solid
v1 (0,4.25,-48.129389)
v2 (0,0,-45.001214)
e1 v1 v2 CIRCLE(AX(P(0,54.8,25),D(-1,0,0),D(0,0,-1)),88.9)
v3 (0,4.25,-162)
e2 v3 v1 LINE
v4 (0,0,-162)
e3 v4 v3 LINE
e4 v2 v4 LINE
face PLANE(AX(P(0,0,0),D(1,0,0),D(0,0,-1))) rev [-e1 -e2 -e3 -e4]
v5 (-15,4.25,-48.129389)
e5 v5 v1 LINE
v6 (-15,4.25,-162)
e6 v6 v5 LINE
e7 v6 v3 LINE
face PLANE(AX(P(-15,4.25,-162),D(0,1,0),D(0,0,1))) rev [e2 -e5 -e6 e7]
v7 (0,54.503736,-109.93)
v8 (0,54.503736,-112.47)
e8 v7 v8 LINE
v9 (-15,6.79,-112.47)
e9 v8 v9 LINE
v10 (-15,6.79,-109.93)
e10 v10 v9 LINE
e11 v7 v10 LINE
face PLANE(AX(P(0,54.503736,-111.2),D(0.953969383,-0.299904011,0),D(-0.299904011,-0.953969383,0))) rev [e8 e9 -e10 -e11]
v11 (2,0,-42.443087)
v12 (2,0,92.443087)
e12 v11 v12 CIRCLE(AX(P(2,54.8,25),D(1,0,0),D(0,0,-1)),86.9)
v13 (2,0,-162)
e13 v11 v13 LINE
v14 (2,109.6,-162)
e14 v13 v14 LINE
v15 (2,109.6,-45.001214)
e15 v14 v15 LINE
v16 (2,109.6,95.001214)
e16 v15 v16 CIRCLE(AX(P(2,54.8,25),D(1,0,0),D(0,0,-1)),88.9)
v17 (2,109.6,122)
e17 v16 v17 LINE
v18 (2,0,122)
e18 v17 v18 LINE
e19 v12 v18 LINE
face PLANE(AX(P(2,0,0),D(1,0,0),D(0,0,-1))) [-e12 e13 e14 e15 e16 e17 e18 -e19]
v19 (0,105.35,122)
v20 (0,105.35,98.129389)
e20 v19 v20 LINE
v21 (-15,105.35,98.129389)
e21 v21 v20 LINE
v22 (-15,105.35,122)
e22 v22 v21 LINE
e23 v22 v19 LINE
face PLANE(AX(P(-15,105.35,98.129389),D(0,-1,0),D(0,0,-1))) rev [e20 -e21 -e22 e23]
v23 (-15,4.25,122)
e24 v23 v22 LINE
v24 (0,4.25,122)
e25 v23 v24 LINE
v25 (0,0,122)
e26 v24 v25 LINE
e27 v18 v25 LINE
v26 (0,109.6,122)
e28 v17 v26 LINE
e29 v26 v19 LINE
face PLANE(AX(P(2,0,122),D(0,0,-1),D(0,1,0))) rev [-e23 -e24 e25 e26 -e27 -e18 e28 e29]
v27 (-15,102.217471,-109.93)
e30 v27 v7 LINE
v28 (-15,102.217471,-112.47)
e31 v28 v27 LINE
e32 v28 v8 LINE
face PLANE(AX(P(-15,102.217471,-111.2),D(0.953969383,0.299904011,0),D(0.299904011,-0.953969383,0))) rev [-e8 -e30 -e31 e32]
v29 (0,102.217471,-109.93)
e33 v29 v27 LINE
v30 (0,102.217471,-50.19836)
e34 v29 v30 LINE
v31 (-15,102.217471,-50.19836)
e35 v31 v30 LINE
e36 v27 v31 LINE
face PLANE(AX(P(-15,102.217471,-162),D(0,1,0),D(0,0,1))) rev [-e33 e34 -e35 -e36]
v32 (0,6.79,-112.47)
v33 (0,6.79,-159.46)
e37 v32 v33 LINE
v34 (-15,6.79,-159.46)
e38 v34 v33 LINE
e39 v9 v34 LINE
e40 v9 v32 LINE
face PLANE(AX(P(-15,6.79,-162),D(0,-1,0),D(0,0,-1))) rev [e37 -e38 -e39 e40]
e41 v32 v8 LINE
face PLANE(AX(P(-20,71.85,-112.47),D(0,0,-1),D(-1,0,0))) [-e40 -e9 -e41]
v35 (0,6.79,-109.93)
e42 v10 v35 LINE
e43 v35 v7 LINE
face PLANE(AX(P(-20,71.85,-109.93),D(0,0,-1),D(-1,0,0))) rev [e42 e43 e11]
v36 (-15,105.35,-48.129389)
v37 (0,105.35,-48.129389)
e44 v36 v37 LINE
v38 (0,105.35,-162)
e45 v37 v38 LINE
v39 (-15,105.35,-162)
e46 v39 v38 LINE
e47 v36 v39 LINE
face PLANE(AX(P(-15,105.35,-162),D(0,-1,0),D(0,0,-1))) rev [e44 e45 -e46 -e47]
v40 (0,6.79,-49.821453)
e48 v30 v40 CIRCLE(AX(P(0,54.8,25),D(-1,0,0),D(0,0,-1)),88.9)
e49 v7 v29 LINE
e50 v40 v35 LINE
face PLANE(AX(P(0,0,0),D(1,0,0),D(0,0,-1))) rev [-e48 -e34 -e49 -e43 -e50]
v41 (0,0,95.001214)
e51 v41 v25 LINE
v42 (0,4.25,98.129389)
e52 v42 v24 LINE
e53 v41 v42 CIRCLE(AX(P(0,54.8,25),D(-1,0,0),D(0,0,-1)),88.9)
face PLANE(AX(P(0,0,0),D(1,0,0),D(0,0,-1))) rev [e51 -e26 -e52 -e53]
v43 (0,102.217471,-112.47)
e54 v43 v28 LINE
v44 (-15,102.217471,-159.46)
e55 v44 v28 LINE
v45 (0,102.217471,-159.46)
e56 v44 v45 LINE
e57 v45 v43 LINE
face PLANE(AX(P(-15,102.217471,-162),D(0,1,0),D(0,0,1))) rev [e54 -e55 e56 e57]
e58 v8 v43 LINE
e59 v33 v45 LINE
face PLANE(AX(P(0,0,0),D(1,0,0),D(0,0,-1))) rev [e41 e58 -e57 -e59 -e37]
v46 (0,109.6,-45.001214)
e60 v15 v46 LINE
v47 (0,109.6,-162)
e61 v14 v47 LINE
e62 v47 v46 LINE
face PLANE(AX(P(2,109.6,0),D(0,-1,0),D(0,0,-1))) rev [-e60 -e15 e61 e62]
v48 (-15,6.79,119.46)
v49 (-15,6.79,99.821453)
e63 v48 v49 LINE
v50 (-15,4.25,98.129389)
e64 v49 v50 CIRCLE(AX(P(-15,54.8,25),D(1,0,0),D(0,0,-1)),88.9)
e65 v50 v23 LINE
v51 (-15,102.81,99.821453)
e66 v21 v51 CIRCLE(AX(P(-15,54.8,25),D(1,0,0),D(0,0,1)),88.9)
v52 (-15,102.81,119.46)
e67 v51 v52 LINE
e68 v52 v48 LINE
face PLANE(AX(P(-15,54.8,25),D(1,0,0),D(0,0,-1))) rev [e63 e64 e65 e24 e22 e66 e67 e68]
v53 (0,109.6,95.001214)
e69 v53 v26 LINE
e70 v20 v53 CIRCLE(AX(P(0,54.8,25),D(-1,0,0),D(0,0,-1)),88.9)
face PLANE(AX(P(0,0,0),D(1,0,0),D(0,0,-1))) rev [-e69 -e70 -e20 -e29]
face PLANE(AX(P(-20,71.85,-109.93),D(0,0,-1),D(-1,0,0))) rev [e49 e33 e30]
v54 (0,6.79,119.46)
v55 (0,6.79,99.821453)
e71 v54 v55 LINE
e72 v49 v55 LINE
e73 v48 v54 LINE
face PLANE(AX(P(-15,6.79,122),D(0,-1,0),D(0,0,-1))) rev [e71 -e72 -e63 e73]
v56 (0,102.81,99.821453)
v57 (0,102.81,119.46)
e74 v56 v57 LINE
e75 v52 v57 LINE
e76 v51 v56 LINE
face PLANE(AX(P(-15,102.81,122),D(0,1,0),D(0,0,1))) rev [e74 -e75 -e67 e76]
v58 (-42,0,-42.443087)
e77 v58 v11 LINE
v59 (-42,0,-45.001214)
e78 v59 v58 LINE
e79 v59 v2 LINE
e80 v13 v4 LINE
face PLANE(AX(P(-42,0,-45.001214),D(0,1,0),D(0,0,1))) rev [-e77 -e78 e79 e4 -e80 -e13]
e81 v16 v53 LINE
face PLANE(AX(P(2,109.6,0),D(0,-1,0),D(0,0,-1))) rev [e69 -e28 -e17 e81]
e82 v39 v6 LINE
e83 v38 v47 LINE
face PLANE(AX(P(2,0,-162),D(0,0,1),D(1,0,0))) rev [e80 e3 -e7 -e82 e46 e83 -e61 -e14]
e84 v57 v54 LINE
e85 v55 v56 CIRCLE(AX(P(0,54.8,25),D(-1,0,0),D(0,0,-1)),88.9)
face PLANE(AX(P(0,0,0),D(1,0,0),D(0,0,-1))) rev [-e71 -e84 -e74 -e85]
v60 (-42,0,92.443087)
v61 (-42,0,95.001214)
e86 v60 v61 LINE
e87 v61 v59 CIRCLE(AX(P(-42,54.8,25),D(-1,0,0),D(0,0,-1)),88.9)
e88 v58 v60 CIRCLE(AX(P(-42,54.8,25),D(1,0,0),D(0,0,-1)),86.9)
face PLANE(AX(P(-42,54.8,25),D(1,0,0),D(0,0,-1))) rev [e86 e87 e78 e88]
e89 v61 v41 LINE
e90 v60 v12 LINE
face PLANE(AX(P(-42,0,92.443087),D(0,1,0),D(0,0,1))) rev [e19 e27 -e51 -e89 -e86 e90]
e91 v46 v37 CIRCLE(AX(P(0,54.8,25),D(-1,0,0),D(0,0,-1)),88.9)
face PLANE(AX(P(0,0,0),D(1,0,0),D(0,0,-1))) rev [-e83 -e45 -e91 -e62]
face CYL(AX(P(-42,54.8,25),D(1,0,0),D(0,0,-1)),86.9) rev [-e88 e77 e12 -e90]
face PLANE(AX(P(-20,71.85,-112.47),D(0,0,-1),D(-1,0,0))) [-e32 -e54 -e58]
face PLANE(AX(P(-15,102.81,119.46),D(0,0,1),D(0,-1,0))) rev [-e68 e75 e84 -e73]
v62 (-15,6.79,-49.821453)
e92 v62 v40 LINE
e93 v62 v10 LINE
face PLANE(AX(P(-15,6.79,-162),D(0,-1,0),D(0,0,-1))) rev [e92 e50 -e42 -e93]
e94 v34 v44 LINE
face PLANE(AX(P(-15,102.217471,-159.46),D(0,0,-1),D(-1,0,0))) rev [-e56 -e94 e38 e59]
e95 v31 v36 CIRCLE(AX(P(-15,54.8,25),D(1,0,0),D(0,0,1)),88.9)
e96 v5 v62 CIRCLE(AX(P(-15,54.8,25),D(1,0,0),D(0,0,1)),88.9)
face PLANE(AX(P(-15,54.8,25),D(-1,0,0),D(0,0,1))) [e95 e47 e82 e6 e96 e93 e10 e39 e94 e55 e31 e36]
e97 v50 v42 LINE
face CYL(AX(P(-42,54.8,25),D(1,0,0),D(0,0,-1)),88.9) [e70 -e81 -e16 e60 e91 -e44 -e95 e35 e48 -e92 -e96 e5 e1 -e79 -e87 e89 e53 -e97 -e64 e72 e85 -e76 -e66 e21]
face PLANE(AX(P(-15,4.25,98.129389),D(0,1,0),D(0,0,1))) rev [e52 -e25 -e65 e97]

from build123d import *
from build123d.topology import SkipClean

# Parameters (mm, degrees)
BOSS_EXTRUDE1_DEPTH = 42.000000074
BOSS_EXTRUDE2_START = -2.000000064
BOSS_EXTRUDE2_DEPTH = 2.000000064
BOSS_EXTRUDE3_DEPTH = 15
BOSS_EXTRUDE4_DEPTH = 15
BOSS_EXTRUDE5_DEPTH = 15
BOSS_EXTRUDE6_DEPTH = 15
RIB1_START          = -1.27
RIB1_DEPTH          = 2.54
RIB2_START          = -1.27
RIB2_DEPTH          = 2.54
SKETCH9_W           = 2.54
SKETCH9_H           = 95.427471492
BOSS_EXTRUDE7_DEPTH = 15
SKETCH10_W          = 2.54
SKETCH10_H          = 96.020000118
BOSS_EXTRUDE8_DEPTH = 15


# Read off the part's stored shape, not the designer's step: Rib1, Rib2
with BuildPart() as part:
    # Sketch1 → Boss-Extrude1 (new body)
    with BuildSketch(Plane.ZY):
        with BuildLine():
            Line((-45.001214275, 0), (-42.443087035, 0))
            ThreePointArc((-42.443087035, 0), (25, 141.699999936), (92.443087035, 0))
            Line((92.443087035, 0), (95.001214275, 0))
            ThreePointArc((95.001214275, 0), (25, 143.7), (-45.001214275, 0))
        make_face()
    extrude(amount=BOSS_EXTRUDE1_DEPTH)

    # Sketch2 → Boss-Extrude2 (add)
    with SkipClean():  # the faces are left unmerged after this step: merging them gives an invalid solid
        with BuildSketch(Plane.ZY.offset(BOSS_EXTRUDE2_START)):
            with BuildLine():
                Line((-160, 0), (-45.001214275, 0))
                ThreePointArc((-45.001214275, 0), (-63.9, 54.8), (-45.001214275, 109.6))
                Line((-45.001214275, 109.6), (-160, 109.6))
                Line((-160, 109.6), (-162.000000064, 109.6))
                Line((-162.000000064, 109.6), (-162.000000064, 0))
                Line((-162.000000064, 0), (-160, 0))
            make_face()
            with BuildLine():
                ThreePointArc((-45.001214275, 0), (25, 143.7), (95.001214275, 0))
                Line((95.001214275, 0), (92.443087035, 0))
                ThreePointArc((92.443087035, 0), (25, 141.699999936), (-42.443087035, 0))
                Line((-42.443087035, 0), (-45.001214275, 0))
            make_face()
            with BuildLine():
                ThreePointArc((95.001214275, 109.6), (113.9, 54.8), (95.001214275, 0))
                Line((95.001214275, 0), (120, 0))
                Line((120, 0), (122.000000064, 0))
                Line((122.000000064, 0), (122.000000064, 109.6))
                Line((122.000000064, 109.6), (120, 109.6))
                Line((120, 109.6), (95.001214275, 109.6))
            make_face()
        extrude(amount=BOSS_EXTRUDE2_DEPTH)

    # Sketch3 → Boss-Extrude3 (add)
    with SkipClean():  # the faces are left unmerged after this step: merging them gives an invalid solid
        with BuildSketch(Plane.ZY):
            with BuildLine():
                Line((98.129388676, 4.249999882), (122.000000064, 4.249999882))
                Line((122.000000064, 4.249999882), (122.000000064, 6.789999882))
                Line((122.000000064, 6.789999882), (99.821453399, 6.789999882))
                ThreePointArc((99.821453399, 6.789999882), (98.986321828, 5.512738133), (98.129388676, 4.249999882))
            make_face()
        extrude(amount=BOSS_EXTRUDE3_DEPTH)

    # Sketch4 → Boss-Extrude4 (add)
    with SkipClean():  # the faces are left unmerged after this step: merging them gives an invalid solid
        with BuildSketch(Plane.ZY):
            with BuildLine():
                Line((98.129388757, 105.35), (122.000000064, 105.35))
                Line((122.000000064, 105.35), (122.000000064, 102.81))
                Line((122.000000064, 102.81), (99.821453474, 102.81))
                ThreePointArc((99.821453474, 102.81), (98.986321906, 104.087261749), (98.129388757, 105.35))
            make_face()
        extrude(amount=BOSS_EXTRUDE4_DEPTH)

    # Sketch5 → Boss-Extrude5 (add)
    with SkipClean():  # the faces are left unmerged after this step: merging them gives an invalid solid
        with BuildSketch(Plane.ZY):
            with BuildLine():
                Line((-162.000000064, 4.25), (-48.129388757, 4.25))
                ThreePointArc((-48.129388757, 4.25), (-48.986321906, 5.512738251), (-49.821453474, 6.79))
                Line((-49.821453474, 6.79), (-162.000000064, 6.79))
                Line((-162.000000064, 6.79), (-162.000000064, 4.25))
            make_face()
        extrude(amount=BOSS_EXTRUDE5_DEPTH)

    # Sketch6 → Boss-Extrude6 (add)
    with SkipClean():  # the faces are left unmerged after this step: merging them gives an invalid solid
        with BuildSketch(Plane.ZY):
            with BuildLine():
                Line((-162.000000064, 102.217471492), (-50.198360336, 102.217471492))
                ThreePointArc((-50.198360336, 102.217471492), (-49.180411643, 103.794658163), (-48.129388757, 105.35))
                Line((-48.129388757, 105.35), (-162.000000064, 105.35))
                Line((-162.000000064, 105.35), (-162.000000064, 102.217471492))
            make_face()
        extrude(amount=BOSS_EXTRUDE6_DEPTH)

    # Rib1 outline → Rib1 (add)
    with SkipClean():  # the faces are left unmerged after this step: merging them gives an invalid solid
        with BuildSketch(Plane(origin=(0, 0, -111.200000064), x_dir=(-1, 0, 0), z_dir=(0, 0, -1)).offset(RIB1_START)):
            Polygon((15, 6.79), (0, 54.503735746), (0, 6.79), align=None)
        extrude(amount=RIB1_DEPTH)

    # Rib2 outline → Rib2 (add)
    with SkipClean():  # the faces are left unmerged after this step: merging them gives an invalid solid
        with BuildSketch(Plane(origin=(0, 0, -111.200000064), x_dir=(-1, 0, 0), z_dir=(0, 0, -1)).offset(RIB2_START)):
            Polygon((0, 54.503735746), (15, 102.217471492), (0, 102.217471492), align=None)
        extrude(amount=RIB2_DEPTH)

    # Sketch9 → Boss-Extrude7 (add)
    with SkipClean():  # the faces are left unmerged after this step: merging them gives an invalid solid
        with BuildSketch(Plane.ZY):
            with Locations((-160.730000064, 54.503735746)):
                Rectangle(SKETCH9_W, SKETCH9_H)
        extrude(amount=BOSS_EXTRUDE7_DEPTH)

    # Sketch10 → Boss-Extrude8 (add)
    with SkipClean():  # the faces are left unmerged after this step: merging them gives an invalid solid
        with BuildSketch(Plane.ZY):
            with Locations((120.730000064, 54.799999941)):
                Rectangle(SKETCH10_W, SKETCH10_H)
        extrude(amount=BOSS_EXTRUDE8_DEPTH)


solid = part.part
